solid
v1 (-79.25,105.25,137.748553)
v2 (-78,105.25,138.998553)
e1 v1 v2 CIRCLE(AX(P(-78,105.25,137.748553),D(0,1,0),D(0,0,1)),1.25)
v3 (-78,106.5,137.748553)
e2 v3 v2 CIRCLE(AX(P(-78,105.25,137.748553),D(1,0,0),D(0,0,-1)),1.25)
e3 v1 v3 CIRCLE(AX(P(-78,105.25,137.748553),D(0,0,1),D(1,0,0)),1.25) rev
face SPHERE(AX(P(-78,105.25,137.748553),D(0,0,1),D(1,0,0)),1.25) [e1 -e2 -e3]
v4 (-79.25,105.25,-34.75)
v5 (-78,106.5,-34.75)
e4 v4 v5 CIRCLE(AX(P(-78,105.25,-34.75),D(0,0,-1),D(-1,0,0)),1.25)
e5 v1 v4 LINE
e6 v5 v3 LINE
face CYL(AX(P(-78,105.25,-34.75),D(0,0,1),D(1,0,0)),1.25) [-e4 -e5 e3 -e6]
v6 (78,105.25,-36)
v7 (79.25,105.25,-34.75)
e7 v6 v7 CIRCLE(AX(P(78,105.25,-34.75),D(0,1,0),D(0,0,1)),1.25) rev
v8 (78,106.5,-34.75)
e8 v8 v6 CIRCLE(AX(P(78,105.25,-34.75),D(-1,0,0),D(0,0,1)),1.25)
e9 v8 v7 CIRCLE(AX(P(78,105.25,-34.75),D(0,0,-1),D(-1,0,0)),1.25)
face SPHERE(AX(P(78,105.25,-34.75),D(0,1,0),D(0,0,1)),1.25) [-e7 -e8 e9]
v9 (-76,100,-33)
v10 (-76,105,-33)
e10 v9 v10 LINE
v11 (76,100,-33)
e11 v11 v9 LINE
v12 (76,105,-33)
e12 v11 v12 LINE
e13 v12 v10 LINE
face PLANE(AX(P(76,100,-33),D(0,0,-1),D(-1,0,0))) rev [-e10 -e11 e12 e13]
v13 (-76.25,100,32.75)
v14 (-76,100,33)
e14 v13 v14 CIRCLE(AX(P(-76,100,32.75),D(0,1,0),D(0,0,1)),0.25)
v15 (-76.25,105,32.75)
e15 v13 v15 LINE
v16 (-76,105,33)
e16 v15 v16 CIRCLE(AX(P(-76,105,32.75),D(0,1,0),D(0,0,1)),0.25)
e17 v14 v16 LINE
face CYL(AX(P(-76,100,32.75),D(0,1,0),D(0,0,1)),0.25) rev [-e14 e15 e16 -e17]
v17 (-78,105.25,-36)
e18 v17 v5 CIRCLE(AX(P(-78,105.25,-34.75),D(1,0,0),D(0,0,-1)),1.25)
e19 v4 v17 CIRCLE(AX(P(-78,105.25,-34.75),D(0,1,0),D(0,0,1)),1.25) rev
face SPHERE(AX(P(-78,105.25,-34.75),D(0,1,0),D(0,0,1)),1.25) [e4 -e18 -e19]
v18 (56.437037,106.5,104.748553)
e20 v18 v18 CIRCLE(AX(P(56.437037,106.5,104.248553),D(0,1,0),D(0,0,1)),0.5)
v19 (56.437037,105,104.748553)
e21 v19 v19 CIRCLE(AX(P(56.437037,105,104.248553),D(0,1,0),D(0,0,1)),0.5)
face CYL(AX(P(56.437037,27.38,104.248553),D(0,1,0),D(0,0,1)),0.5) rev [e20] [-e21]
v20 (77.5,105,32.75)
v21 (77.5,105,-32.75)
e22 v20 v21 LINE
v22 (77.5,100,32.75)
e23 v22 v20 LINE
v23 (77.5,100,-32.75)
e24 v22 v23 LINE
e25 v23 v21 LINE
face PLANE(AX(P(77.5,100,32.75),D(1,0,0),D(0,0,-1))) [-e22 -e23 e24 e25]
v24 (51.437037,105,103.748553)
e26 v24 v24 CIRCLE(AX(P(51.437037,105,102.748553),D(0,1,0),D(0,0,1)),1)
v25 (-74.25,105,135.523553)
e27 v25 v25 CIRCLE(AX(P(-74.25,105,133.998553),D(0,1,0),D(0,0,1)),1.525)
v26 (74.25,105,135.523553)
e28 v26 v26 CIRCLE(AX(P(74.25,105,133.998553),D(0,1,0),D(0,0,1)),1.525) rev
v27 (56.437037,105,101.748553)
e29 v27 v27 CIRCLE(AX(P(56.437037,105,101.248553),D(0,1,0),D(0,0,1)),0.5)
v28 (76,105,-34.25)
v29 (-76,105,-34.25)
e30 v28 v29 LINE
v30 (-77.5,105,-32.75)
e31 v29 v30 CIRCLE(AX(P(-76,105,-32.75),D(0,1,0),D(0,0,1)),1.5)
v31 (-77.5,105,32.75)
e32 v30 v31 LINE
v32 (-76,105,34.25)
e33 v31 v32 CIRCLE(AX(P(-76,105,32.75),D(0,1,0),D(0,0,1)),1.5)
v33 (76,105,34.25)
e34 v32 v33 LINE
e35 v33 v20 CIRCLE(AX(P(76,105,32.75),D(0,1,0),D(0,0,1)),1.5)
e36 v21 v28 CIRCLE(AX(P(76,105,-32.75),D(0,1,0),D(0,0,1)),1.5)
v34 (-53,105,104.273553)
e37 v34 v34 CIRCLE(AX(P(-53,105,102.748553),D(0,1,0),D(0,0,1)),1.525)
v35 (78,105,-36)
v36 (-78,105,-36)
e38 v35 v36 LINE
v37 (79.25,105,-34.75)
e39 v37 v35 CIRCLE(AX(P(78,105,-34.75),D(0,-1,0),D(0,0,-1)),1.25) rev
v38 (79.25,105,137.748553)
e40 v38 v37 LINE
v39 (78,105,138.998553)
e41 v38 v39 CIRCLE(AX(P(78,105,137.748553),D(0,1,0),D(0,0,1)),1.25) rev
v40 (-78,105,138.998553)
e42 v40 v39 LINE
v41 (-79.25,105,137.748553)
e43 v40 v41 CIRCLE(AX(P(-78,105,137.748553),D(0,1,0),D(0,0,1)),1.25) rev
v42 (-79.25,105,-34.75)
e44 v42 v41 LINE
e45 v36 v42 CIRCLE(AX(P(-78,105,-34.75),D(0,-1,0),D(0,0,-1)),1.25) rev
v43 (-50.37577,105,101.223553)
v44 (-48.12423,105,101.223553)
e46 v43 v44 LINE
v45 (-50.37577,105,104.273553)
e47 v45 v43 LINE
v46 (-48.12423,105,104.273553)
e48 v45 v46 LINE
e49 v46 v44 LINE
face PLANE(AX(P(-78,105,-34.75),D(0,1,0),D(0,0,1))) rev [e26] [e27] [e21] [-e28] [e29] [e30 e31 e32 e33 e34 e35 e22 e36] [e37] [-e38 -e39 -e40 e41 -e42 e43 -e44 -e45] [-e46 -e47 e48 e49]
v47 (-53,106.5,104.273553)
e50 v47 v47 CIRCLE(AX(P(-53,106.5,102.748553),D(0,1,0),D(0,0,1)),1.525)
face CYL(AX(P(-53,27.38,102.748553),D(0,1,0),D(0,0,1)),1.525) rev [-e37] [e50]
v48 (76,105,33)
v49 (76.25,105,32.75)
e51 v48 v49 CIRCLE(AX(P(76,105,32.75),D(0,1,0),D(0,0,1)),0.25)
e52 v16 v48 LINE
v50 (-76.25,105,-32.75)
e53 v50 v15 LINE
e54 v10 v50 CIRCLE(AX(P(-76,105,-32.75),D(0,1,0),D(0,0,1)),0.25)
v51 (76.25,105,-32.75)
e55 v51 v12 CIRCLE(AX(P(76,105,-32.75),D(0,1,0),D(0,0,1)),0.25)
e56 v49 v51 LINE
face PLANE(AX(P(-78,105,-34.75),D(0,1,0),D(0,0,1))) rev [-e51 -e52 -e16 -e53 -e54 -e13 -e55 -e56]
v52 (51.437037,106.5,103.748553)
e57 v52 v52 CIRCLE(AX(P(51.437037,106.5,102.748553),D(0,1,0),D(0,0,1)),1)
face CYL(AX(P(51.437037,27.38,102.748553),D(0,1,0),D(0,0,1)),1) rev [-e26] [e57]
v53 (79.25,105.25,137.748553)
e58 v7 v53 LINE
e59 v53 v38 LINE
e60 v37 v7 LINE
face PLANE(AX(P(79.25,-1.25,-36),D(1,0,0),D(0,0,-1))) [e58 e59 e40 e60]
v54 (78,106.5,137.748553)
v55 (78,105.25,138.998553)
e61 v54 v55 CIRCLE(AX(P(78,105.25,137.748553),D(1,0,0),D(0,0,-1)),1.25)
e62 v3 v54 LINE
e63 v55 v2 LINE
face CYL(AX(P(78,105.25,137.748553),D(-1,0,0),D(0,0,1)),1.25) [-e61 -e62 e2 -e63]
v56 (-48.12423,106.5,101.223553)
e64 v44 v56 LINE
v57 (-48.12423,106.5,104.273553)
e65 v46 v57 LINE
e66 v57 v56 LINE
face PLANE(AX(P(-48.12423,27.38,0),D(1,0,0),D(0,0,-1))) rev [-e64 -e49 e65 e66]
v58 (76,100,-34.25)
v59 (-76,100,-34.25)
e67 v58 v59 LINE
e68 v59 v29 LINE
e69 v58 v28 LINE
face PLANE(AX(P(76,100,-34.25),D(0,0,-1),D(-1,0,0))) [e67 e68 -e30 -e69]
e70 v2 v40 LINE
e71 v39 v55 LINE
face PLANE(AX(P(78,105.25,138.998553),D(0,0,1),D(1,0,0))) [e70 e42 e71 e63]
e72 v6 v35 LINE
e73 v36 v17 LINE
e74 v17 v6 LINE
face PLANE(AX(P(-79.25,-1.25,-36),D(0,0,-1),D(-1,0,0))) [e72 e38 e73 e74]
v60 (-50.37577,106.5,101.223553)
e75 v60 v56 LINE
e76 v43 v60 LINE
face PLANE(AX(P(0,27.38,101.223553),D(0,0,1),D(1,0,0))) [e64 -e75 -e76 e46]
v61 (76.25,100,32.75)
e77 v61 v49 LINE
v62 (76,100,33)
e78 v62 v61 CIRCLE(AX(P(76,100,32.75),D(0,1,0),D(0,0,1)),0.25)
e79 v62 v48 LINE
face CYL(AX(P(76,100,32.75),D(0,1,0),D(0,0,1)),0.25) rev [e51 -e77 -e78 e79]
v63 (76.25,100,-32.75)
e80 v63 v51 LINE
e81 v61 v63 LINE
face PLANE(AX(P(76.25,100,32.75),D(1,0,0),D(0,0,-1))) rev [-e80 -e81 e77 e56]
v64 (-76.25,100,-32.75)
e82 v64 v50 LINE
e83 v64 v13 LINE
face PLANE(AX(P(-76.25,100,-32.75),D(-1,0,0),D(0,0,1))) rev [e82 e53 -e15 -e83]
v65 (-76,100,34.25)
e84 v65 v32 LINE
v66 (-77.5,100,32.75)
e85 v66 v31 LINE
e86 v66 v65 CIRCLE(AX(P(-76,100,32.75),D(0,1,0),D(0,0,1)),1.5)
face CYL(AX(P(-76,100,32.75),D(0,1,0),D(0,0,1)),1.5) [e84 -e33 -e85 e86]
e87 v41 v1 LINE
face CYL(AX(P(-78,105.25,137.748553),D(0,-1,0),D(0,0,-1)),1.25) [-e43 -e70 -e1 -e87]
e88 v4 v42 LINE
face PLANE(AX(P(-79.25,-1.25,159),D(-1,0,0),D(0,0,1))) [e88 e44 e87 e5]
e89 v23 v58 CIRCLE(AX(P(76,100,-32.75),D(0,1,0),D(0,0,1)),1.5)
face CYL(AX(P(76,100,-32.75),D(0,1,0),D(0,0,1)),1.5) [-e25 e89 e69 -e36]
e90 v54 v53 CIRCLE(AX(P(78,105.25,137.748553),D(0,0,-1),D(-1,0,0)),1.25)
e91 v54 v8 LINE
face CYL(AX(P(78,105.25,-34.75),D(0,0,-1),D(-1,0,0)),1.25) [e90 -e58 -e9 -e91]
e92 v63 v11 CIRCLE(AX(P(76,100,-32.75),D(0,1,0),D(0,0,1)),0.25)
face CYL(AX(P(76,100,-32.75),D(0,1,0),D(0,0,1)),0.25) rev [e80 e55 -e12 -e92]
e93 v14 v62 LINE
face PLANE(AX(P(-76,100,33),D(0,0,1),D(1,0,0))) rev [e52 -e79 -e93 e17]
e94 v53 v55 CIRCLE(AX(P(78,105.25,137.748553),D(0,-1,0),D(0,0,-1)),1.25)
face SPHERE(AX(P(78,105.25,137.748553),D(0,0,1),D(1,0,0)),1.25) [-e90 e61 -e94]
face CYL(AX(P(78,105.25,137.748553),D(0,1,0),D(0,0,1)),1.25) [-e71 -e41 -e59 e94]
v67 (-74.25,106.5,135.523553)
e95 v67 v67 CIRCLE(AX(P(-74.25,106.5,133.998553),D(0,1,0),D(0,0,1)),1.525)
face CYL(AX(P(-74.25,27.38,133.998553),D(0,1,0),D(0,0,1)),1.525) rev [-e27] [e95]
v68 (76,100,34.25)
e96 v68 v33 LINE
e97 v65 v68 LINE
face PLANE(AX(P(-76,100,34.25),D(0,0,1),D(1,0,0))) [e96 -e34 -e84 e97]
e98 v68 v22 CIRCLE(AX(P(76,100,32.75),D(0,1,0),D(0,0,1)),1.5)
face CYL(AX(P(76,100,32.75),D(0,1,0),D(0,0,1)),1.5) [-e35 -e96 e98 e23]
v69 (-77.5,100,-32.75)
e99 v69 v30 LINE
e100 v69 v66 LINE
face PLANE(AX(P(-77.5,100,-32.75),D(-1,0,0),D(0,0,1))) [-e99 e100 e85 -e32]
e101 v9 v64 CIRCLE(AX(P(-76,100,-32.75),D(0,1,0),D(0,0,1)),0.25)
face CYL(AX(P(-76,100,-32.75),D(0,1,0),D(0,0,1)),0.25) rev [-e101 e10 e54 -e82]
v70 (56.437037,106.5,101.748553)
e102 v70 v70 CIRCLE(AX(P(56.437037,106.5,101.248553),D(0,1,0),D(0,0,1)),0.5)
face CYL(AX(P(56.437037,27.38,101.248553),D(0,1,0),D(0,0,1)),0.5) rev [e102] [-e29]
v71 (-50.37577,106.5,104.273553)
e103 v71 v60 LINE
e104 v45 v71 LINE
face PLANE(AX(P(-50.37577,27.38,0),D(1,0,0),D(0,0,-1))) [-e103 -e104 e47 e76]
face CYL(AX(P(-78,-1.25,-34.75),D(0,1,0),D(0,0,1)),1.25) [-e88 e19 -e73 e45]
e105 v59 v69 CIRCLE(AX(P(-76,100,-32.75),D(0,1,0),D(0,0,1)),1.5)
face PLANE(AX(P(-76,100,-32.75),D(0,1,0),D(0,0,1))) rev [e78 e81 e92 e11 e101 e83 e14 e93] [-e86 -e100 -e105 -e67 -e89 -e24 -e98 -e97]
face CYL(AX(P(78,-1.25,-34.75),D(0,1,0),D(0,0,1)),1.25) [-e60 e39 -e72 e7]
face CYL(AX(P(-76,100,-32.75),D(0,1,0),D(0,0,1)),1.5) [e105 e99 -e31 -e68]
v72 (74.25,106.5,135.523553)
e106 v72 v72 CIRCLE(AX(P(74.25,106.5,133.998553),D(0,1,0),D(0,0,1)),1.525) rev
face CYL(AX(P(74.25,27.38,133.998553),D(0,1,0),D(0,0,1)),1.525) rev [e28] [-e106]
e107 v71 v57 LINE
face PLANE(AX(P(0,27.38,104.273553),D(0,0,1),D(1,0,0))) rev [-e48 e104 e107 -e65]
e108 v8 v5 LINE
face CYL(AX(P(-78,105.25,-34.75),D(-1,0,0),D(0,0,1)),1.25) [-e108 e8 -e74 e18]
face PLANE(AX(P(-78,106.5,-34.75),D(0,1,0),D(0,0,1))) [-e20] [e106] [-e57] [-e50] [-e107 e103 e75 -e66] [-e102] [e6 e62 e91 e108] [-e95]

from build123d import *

# Parameters (mm, degrees)
BOSS_EXTRUDE1_DEPTH      = 1.25
SKETCH1_W                = 156
SKETCH1_H                = 69.5
BOSS_EXTRUDE2_DEPTH      = 105
SKETCH4_R                = 2.5000000000000027
BOSS_EXTRUDE3_DEPTH      = 8
FILLET2_R                = 2
SKETCH5_R                = 1.5499999999999998
SKETCH5_R_2              = 1.5500000000000012
CUT_EXTRUDE1_DEPTH       = 8
SKETCH6_R                = 8.25
CUT_EXTRUDE2_DEPTH       = 8
SKETCH8_R                = 3.750000000000007
SKETCH8_R_2              = 3.0000000000000084
SKETCH8_W                = 7.000000000000014
SKETCH8_H                = 14
CUT_EXTRUDE3_DEPTH       = 8
FILLET3_R                = 1.25
FILLET4_R                = 1.25
SKETCH11_R               = 1.5499999999999932
CUT_EXTRUDE4_DEPTH       = 8
BOSS_EXTRUDE5_REACH      = 209.004
FILLET5_R                = 1.25
SKETCH14_R               = 1.5249999999999995
CUT_EXTRUDE5_DEPTH       = 8
BOSS_EXTRUDE6_DEPTH      = 5
CUT_EXTRUDE10_DEPTH      = 176.50000000000017
CUT_EXTRUDE10_DEPTH_BACK = 9
SKETCH19_R               = 1.5249999999999995
BOSS_EXTRUDE7_DEPTH      = 1.5
SKETCH17_W               = 214.39373035957487
SKETCH17_H               = 311.75060194691184
CUT_EXTRUDE6_DEPTH       = 142.50000000000003
SKETCH18_W               = 843.8612520819788
SKETCH18_H               = 210.19069540658822
CUT_EXTRUDE7_DEPTH       = 211.50000000000009
FILLET6_R                = 1.25
SKETCH21_R               = 1.5249999999999995
CUT_EXTRUDE11_DEPTH      = 46.50000000000004
SKETCH22_R               = 1.5249999999999952
SKETCH22_R_2             = 0.49999999999999917
SKETCH22_R_3             = 0.9999999999999983
CUT_EXTRUDE12_DEPTH      = 46.50000000000004
SKETCH23_W               = 224.34927592813784
SKETCH23_H               = 20
CUT_EXTRUDE13_DEPTH      = 108.00000000000004
SKETCH24_W               = 223.8278832276348
SKETCH24_H               = 83.20006380200533
CUT_EXTRUDE14_DEPTH      = 108.00000000000004
BOSS_EXTRUDE8_DEPTH      = 79.12
FILLET7_R                = 1.25
SKETCH27_R               = 1.5249999999999904
SKETCH27_R_2             = 0.9999999999999983
SKETCH27_R_3             = 0.4999999999999892
SKETCH27_R_4             = 0.5000000000000013
SKETCH27_W               = 2.251539255366019
SKETCH27_H               = 3.049999999999997
CUT_EXTRUDE16_DEPTH      = 79.12
SKETCH28_R               = 1.5249999999999995
CUT_EXTRUDE17_DEPTH      = 79.12


with BuildPart() as part:
    # Sketch2 → Boss-Extrude1 (new body)
    with BuildSketch(Plane(origin=(0, 0, 0), x_dir=(1, 0, 0), z_dir=(0, 1, 0))):
        Polygon((-79.25000000000004, 35.99999999999998), (79.24999999999996, 35.99999999999999), (79.24999999999999, -159.00000000000003), (-79.25000000000001, -159.00000000000003), align=None)
    extrude(amount=-BOSS_EXTRUDE1_DEPTH)

    # Sketch1 → Boss-Extrude2 (add)
    with BuildSketch(Plane(origin=(0, 0, 0), x_dir=(1, 0, 0), z_dir=(0, 1, 0))):
        Polygon((79.24999999999999, -159.00000000000003), (-79.25000000000001, -159.00000000000003), (-79.25000000000004, -86.00000000000001), (-79.25000000000004, -36.00000000000002), (-79.25000000000004, 35.99999999999998), (79.24999999999996, 35.99999999999999), (79.24999999999996, -36.00000000000002), (79.24999999999996, -86.00000000000001), align=None)
        Polygon((-78.00000000000001, -157.75000000000006), (77.99999999999999, -157.75000000000006), (77.99999999999996, -86.00000000000001), (77.99999999999996, -36.00000000000002), (-78.00000000000004, -36.00000000000002), (-78.00000000000004, -86.00000000000001), (-78.00000000000004, -100.58859756900745), align=None, mode=Mode.SUBTRACT)
        Rectangle(SKETCH1_W, SKETCH1_H, mode=Mode.SUBTRACT)
    extrude(amount=BOSS_EXTRUDE2_DEPTH)

    # Sketch4 → Boss-Extrude3 (add)
    with BuildSketch(Plane(origin=(0, 0, 0), x_dir=(1, 0, 0), z_dir=(0, 1, 0))):
        with Locations(Location((-37.074999999999996, -117.75000000000004, 0), (0, 0, 90))):
            Circle(SKETCH4_R)
        with Locations(Location((37.074999999999996, -117.75000000000003, 0), (0, 0, 90))):
            Circle(SKETCH4_R)
    extrude(amount=BOSS_EXTRUDE3_DEPTH)

    # Fillet2
    fillet2_edges = [part.edges().sort_by_distance(p)[0] for p in [
        (77.99999999999996, 52.5, -34.749999999999986),
        (77.99999999999996, 52.5, 34.750000000000014),
        (-78.00000000000004, 0, 1.421e-14),
        (-78.00000000000004, 52.5, 34.750000000000014),
        (77.99999999999999, 52.5, 157.75000000000006),
        (-78.00000000000001, 52.5, 157.75000000000006),
        (-4.263e-14, 0, 36.00000000000002),
        (-78.00000000000004, 52.5, 36.00000000000002),
        (77.99999999999997, 0, 96.87500000000003),
        (77.99999999999996, 52.5, 36.00000000000002),
        (-4.263e-14, 0, -34.749999999999986),
        (-78.00000000000004, 52.5, -34.749999999999986),
        (-1.421e-14, 0, 157.75000000000006),
        (-78.00000000000003, 0, 96.87500000000004),
        (77.99999999999996, 0, 1.421e-14),
        (-4.263e-14, 0, 34.750000000000014),
        (-37.074999999999996, 0, 120.25000000000004),
        (37.074999999999996, 0, 120.25000000000003),
    ]]
    fillet(fillet2_edges, radius=FILLET2_R)

    # Sketch5 → Cut-Extrude1 (cut)
    with BuildSketch(Plane.XY.offset(36.00000000000002)):
        with BuildLine():
            ThreePointArc((-53.750000000000085, 99.54999999999998), (-54.84601551083924, 99.09601551083914), (-55.30000000000008, 97.99999999999999))
            Line((-55.30000000000008, 97.99999999999999), (-53.750000000000085, 97.99999999999999))
            Line((-53.750000000000085, 97.99999999999999), (-53.750000000000085, 99.54999999999998))
        make_face()
        with BuildLine():
            Line((-53.750000000000085, 97.99999999999999), (-55.30000000000008, 97.99999999999999))
            ThreePointArc((-55.30000000000008, 97.99999999999999), (-53.750000000000085, 96.44999999999999), (-52.20000000000009, 97.99999999999999))
            ThreePointArc((-52.20000000000009, 97.99999999999999), (-52.65398448916093, 99.09601551083914), (-53.750000000000085, 99.54999999999998))
            Line((-53.750000000000085, 99.54999999999998), (-53.750000000000085, 97.99999999999999))
        make_face()
        with Locations((53.750000000000206, 97.99999999999967)):
            Circle(SKETCH5_R)
        with Locations((-53.750000000000085, 7.999999999999743)):
            Circle(SKETCH5_R_2)
        with Locations((53.749999999999666, 7.9999999999994245)):
            Circle(SKETCH5_R_2)
    extrude(amount=-CUT_EXTRUDE1_DEPTH, mode=Mode.SUBTRACT)

    # Sketch6 → Cut-Extrude2 (cut)
    with BuildSketch(Plane(origin=(0, 0, 157.75000000000006), x_dir=(-1, 0, 0), z_dir=(0, 0, -1))):
        with Locations((0, 22)):
            Circle(SKETCH6_R)
    extrude(amount=-CUT_EXTRUDE2_DEPTH, mode=Mode.SUBTRACT)

    # Sketch8 → Cut-Extrude3 (cut)
    with BuildSketch(Plane.ZY.offset(79.25000000000004)):
        with Locations((131.5, 54.99999999999998)):
            Circle(SKETCH8_R)
        with Locations((101.50000000000001, 54.99999999999998)):
            Circle(SKETCH8_R_2)
        with Locations((116.50000000000003, 64.99999999999999)):
            Rectangle(SKETCH8_W, SKETCH8_H)
        with Locations((101.50000000000001, 64.99999999999997)):
            Circle(SKETCH8_R_2)
        with Locations((101.50000000000001, 74.99999999999997)):
            Circle(SKETCH8_R_2)
        with Locations((101.50000000000001, 84.99999999999997)):
            Circle(SKETCH8_R_2)
        with Locations((131.5, 74.99999999999999)):
            Circle(SKETCH8_R)
    extrude(amount=-CUT_EXTRUDE3_DEPTH, mode=Mode.SUBTRACT)

    # Fillet3
    fillet3_edges = [part.edges().sort_by_distance(p)[0] for p in [
        (79.24999999999997, -1.25, 61.50000000000002),
        (-4.263e-14, -1.25, -35.999999999999986),
        (-79.25000000000003, -1.25, 61.50000000000003),
        (-1.421e-14, -1.25, 159.00000000000003),
    ]]
    fillet(fillet3_edges, radius=FILLET3_R)

    # Fillet4
    # the kernel refuses this fillet: 1.25 mm, written as the material it takes off along each edge
    with BuildSketch(Plane(origin=(-78.00000000000004, 0, -34.74999999999997), x_dir=(-9e-17, 0, -1), z_dir=(-1, 0, 1.5e-16))) as fillet4_piece_1_section:
        Polygon((0, 0), (FILLET4_R, 0), (FILLET4_R, FILLET4_R), (0, FILLET4_R), align=None)
    fillet4_piece_1 = extrude(amount=FILLET4_R, mode=Mode.PRIVATE)
    fillet4_piece_1 = fillet4_piece_1 - Plane(origin=(-78.00000000000004, 0, -34.74999999999997), x_dir=(0, 0.7071067811865475, 0.7071067811865475), z_dir=(-1, 0, 1.5e-16)) * Sphere(FILLET4_R, mode=Mode.PRIVATE)
    add(fillet4_piece_1, mode=Mode.SUBTRACT)
    with BuildSketch(Plane(origin=(77.99999999999996, 0, -34.74999999999999), x_dir=(-9e-17, 0, -1), z_dir=(1, 0, -1.5e-16))) as fillet4_piece_2_section:
        Polygon((0, 0), (FILLET4_R, 0), (FILLET4_R, -FILLET4_R), (0, -FILLET4_R), align=None)
    fillet4_piece_2 = extrude(amount=FILLET4_R, mode=Mode.PRIVATE)
    fillet4_piece_2 = fillet4_piece_2 - Plane(origin=(77.99999999999996, 0, -34.74999999999999), x_dir=(0, 0.7071067811865475, 0.7071067811865475), z_dir=(1, 0, -1.5e-16)) * Sphere(FILLET4_R, mode=Mode.PRIVATE)
    add(fillet4_piece_2, mode=Mode.SUBTRACT)
    with BuildSketch(Plane(origin=(-78.00000000000001, 0, 157.75000000000003), x_dir=(-1, 0, 1.5e-16), z_dir=(0, 0, 1))) as fillet4_piece_3_section:
        Polygon((0, 0), (FILLET4_R, 0), (FILLET4_R, FILLET4_R), (0, FILLET4_R), align=None)
    fillet4_piece_3 = extrude(amount=FILLET4_R, mode=Mode.PRIVATE)
    fillet4_piece_3 = fillet4_piece_3 - Plane(origin=(-78.00000000000001, 0, 157.75000000000003), x_dir=(0.7071067811865475, 0.7071067811865475, 0), z_dir=(0, 0, 1)) * Sphere(FILLET4_R, mode=Mode.PRIVATE)
    add(fillet4_piece_3, mode=Mode.SUBTRACT)
    with BuildSketch(Plane(origin=(77.99999999999999, 0, 157.75000000000003), x_dir=(1, 0, -1.5e-16), z_dir=(0, 0, 1))) as fillet4_piece_4_section:
        Polygon((0, 0), (FILLET4_R, 0), (FILLET4_R, -FILLET4_R), (0, -FILLET4_R), align=None)
    fillet4_piece_4 = extrude(amount=FILLET4_R, mode=Mode.PRIVATE)
    fillet4_piece_4 = fillet4_piece_4 - Plane(origin=(77.99999999999999, 0, 157.75000000000003), x_dir=(-0.7071067811865475, 0.7071067811865475, 0), z_dir=(0, 0, 1)) * Sphere(FILLET4_R, mode=Mode.PRIVATE)
    add(fillet4_piece_4, mode=Mode.SUBTRACT)
    with BuildSketch(Plane(origin=(79.24999999999999, 108.12500000000007, 159.00000000000003), x_dir=(-1, 0, 0), z_dir=(0, -1, 0))) as fillet4_piece_5:
        with BuildLine():
            CenterArc((FILLET4_R, FILLET4_R), FILLET4_R, 179.9999999999987, 90.00000000000131)
            Line((0, FILLET4_R), (0, 0))
            Line((0, 0), (FILLET4_R, 0))
        make_face()
    extrude(amount=108.12500000000007, mode=Mode.SUBTRACT)
    with BuildSketch(Plane(origin=(-79.25000000000001, -2.2e-16, 159.00000000000003), x_dir=(1, 0, 0), z_dir=(0, 1, 0))) as fillet4_piece_6:
        with BuildLine():
            CenterArc((FILLET4_R, FILLET4_R), FILLET4_R, 180, 90)
            Line((0, FILLET4_R), (0, 0))
            Line((0, 0), (FILLET4_R, 0))
        make_face()
    extrude(amount=108.12499999999999, mode=Mode.SUBTRACT)
    with BuildSketch(Plane(origin=(79.24999999999996, 108.125, -35.99999999999999), x_dir=(0, 0, 1), z_dir=(0, -1, 0))) as fillet4_piece_7:
        with BuildLine():
            CenterArc((FILLET4_R, FILLET4_R), FILLET4_R, 180, 90)
            Line((0, FILLET4_R), (0, 0))
            Line((0, 0), (FILLET4_R, 0))
        make_face()
    extrude(amount=108.125, mode=Mode.SUBTRACT)
    with BuildSketch(Plane(origin=(-79.25000000000004, -2.2e-16, -35.99999999999998), x_dir=(0, 0, 1), z_dir=(0, 1, 0))) as fillet4_piece_8:
        with BuildLine():
            CenterArc((FILLET4_R, FILLET4_R), FILLET4_R, 180, 90)
            Line((-2.132e-14, FILLET4_R), (0, 0))
            Line((0, 0), (FILLET4_R, 0))
        make_face()
    extrude(amount=108.12499999999999, mode=Mode.SUBTRACT)

    # Sketch11 → Cut-Extrude4 (cut)
    with BuildSketch(Plane(origin=(79.24999999999996, 0, -1.128e-14), x_dir=(-1.4e-16, 0, -1), z_dir=(1, 0, -1.4e-16))):
        with BuildLine():
            ThreePointArc((-13.05000000000001, 102.49999999999999), (-12.596015510839159, 101.40398448916083), (-11.50000000000001, 100.94999999999999))
            Line((-11.50000000000001, 100.94999999999999), (-11.50000000000001, 102.49999999999999))
            Line((-11.500000000000014, 102.49999999999999), (-13.050000000000011, 102.49999999999999))
        make_face()
        with BuildLine():
            Line((-11.50000000000001, 102.49999999999999), (-11.50000000000001, 100.94999999999999))
            ThreePointArc((-11.50000000000001, 100.94999999999999), (-10.403984489160864, 101.40398448916083), (-9.950000000000012, 102.49999999999999))
            ThreePointArc((-9.950000000000012, 102.49999999999999), (-11.50000000000001, 104.04999999999998), (-13.05000000000001, 102.49999999999999))
            Line((-13.050000000000011, 102.49999999999999), (-11.500000000000014, 102.49999999999999))
        make_face()
        with BuildLine():
            ThreePointArc((-25.550000000000008, 90), (-25.096015510839155, 88.90398448916085), (-24.000000000000007, 88.45))
            Line((-24.000000000000007, 88.45000000000002), (-24.000000000000007, 90))
            Line((-24, 90), (-25.55000000000001, 90))
        make_face()
        with BuildLine():
            Line((-24.000000000000007, 90), (-24.000000000000007, 88.45000000000002))
            ThreePointArc((-24.000000000000007, 88.45), (-22.90398448916086, 88.90398448916085), (-22.450000000000006, 90))
            ThreePointArc((-22.450000000000006, 90), (-24.000000000000007, 91.55), (-25.550000000000008, 90))
            Line((-25.55000000000001, 90), (-24, 90))
        make_face()
        with BuildLine():
            ThreePointArc((-9.949999999999998, 2.4999999999999742), (-10.403984489160848, 3.5960155108391216), (-11.499999999999995, 4.049999999999974))
            Line((-11.499999999999996, 4.049999999999969), (-11.499999999999996, 2.4999999999999716))
            Line((-11.5, 2.4999999999999742), (-13.049999999999997, 2.4999999999999742))
            ThreePointArc((-13.049999999999995, 2.4999999999999742), (-11.499999999999996, 0.9499999999999749), (-9.949999999999998, 2.499999999999974))
        make_face()
        with BuildLine():
            Line((-11.499999999999996, 2.4999999999999716), (-11.499999999999996, 4.049999999999969))
            ThreePointArc((-11.499999999999995, 4.049999999999974), (-12.596015510839145, 3.596015510839123), (-13.049999999999995, 2.4999999999999742))
            Line((-13.049999999999997, 2.4999999999999742), (-11.5, 2.4999999999999742))
        make_face()
        with BuildLine():
            ThreePointArc((-111.5, 4.049999999999969), (-112.59601551083915, 1.40398448916083), (-109.95, 2.499999999999974))
            Line((-109.95, 2.4999999999999742), (-111.5, 2.4999999999999742))
            Line((-111.5, 2.4999999999999716), (-111.5, 4.049999999999969))
        make_face()
        with BuildLine():
            Line((-111.5, 2.4999999999999742), (-109.95, 2.4999999999999742))
            ThreePointArc((-109.95, 2.4999999999999742), (-110.40398448916086, 3.5960155108391185), (-111.5, 4.049999999999969))
            Line((-111.5, 4.049999999999969), (-111.5, 2.4999999999999716))
        make_face()
        with BuildLine():
            ThreePointArc((-97.45, 14.999999999999993), (-97.90398448916086, 16.096015510839138), (-99, 16.549999999999986))
            Line((-99, 16.549999999999986), (-99, 14.999999999999993))
            Line((-99, 14.999999999999993), (-97.45, 14.999999999999993))
        make_face()
        with BuildLine():
            Line((-99, 14.999999999999993), (-99, 16.549999999999986))
            ThreePointArc((-99, 16.549999999999986), (-100.09601551083915, 13.903984489160848), (-97.45, 14.999999999999993))
            Line((-97.45, 14.999999999999993), (-99, 14.999999999999993))
        make_face()
        with BuildLine():
            ThreePointArc((-22.450000000000006, 14.999999999999993), (-22.90398448916086, 16.09601551083914), (-24.000000000000007, 16.549999999999994))
            Line((-24.000000000000007, 16.549999999999994), (-24.000000000000007, 14.999999999999993))
            Line((-24, 14.999999999999993), (-25.55000000000001, 14.999999999999993))
            ThreePointArc((-25.550000000000008, 14.999999999999993), (-24.000000000000007, 13.449999999999992), (-22.450000000000006, 14.999999999999993))
        make_face()
        with BuildLine():
            Line((-24.000000000000007, 14.999999999999993), (-24.000000000000007, 16.549999999999994))
            ThreePointArc((-24.000000000000007, 16.549999999999994), (-25.096015510839155, 16.09601551083914), (-25.550000000000008, 14.999999999999993))
            Line((-25.55000000000001, 14.999999999999993), (-24, 14.999999999999993))
        make_face()
        with Locations((-111.50000000000001, 102.49999999999999)):
            Circle(SKETCH11_R)
        with Locations((-99, 90)):
            Circle(SKETCH11_R)
    extrude(amount=-CUT_EXTRUDE4_DEPTH, mode=Mode.SUBTRACT)

    # Boss-Extrude5: up to this face of the body (flat: up to its plane)
    boss_extrude5_end = Plane(part.part.faces().sort_by_distance((0, 0, 96.725539908))[0])
    # Sketch12 → Boss-Extrude5 (add, up to the picked face)
    with BuildSketch(Plane(origin=(0, 105, 0), x_dir=(1, 0, 0), z_dir=(0, 1, 0)), mode=Mode.PRIVATE) as boss_extrude5_sk1:
        with BuildLine():
            Line((73, -152.75000000000043), (72.99999999999997, -157.75000000000043))
            Line((72.99999999999997, -157.75000000000043), (75.99999999999996, -157.75000000000045))
            ThreePointArc((75.99999999999996, -157.75000000000006), (77.41421356237305, -157.16421356237316), (77.99999999999994, -155.75000000000006))
            Line((77.99999999999999, -155.75000000000006), (78, -152.75000000000045))
            Line((78, -152.75000000000045), (73, -152.75000000000043))
        make_face()
    boss_extrude5_tool1 = split(extrude(boss_extrude5_sk1.sketch, amount=-BOSS_EXTRUDE5_REACH, mode=Mode.PRIVATE), bisect_by=boss_extrude5_end, keep=Keep.BOTH, mode=Mode.PRIVATE)
    # Sketch12 → Boss-Extrude5 (add, up to the picked face)
    with BuildSketch(Plane(origin=(0, 105, 0), x_dir=(1, 0, 0), z_dir=(0, 1, 0)), mode=Mode.PRIVATE) as boss_extrude5_sk2:
        with BuildLine():
            ThreePointArc((-78.00000000000003, -155.75000000000006), (-77.41421356237313, -157.16421356237316), (-76.00000000000003, -157.75000000000006))
            Line((-76.00000000000003, -157.75000000000006), (-73.00000000000003, -157.75000000000006))
            Line((-73.00000000000003, -157.75000000000006), (-73.00000000000003, -152.75000000000006))
            Line((-73.00000000000003, -152.75000000000006), (-78.00000000000003, -152.75000000000006))
            Line((-78.00000000000003, -152.75000000000006), (-78.00000000000003, -155.75000000000006))
        make_face()
    boss_extrude5_tool2 = split(extrude(boss_extrude5_sk2.sketch, amount=-BOSS_EXTRUDE5_REACH, mode=Mode.PRIVATE), bisect_by=boss_extrude5_end, keep=Keep.BOTH, mode=Mode.PRIVATE)
    add(boss_extrude5_tool1.solids().sort_by(Axis((75.426992, 105, 155.176992), (0, -1, 0)))[0])
    add(boss_extrude5_tool2.solids().sort_by(Axis((-75.426992, 105, 155.176992), (0, -1, 0)))[0])

    # Fillet5
    fillet5_edges = [part.edges().sort_by_distance(p)[0] for p in [
        (77.41421356237306, 0.5857864376269042, 152.75000000000043),
        (72.99999999999999, 0.5857864376269046, 157.16421356237316),
        (72.99999999999997, 53.5, 157.75000000000043),
        (74.49999999999999, 0, 152.75000000000043),
        (73, 52.5, 152.75000000000043),
        (78, 53.5, 152.75000000000045),
        (73, 0, 154.25000000000023),
        (-77.41421356237313, 0.5857864376269042, 152.75000000000006),
        (-73.00000000000003, 0, 154.25000000000006),
        (-73.00000000000003, 52.5, 152.75000000000006),
        (-78.00000000000003, 53.5, 152.75000000000006),
        (-74.50000000000003, 0, 152.75000000000006),
        (-73.00000000000003, 0.5857864376269046, 157.16421356237316),
        (-73.00000000000003, 53.5, 157.75000000000006),
    ]]
    fillet(fillet5_edges, radius=FILLET5_R)

    # Sketch14 → Cut-Extrude5 (cut)
    with BuildSketch(Plane(origin=(0, 105, 0), x_dir=(1, 0, 0), z_dir=(0, 1, 0))):
        with Locations(Location((75.68305826175839, -155.43305826175865, 0), (0, 0, 270))):
            Circle(SKETCH14_R)
        with Locations(Location((-75.68305826175845, -155.43305826175828, 0), (0, 0, 270))):
            Circle(SKETCH14_R)
    extrude(amount=-CUT_EXTRUDE5_DEPTH, mode=Mode.SUBTRACT)

    # Sketch19 → Cut-Extrude10 (cut, two sides: drawn at the far end of the back side and taken through both)
    with BuildSketch(Plane(origin=(0, 105, 0), x_dir=(1, 0, 0), z_dir=(0, 1, 0)).offset(-CUT_EXTRUDE10_DEPTH_BACK)):
        with Locations(Location((75.68305826175839, -155.43305826175865, 0), (0, 0, 270))):
            Circle(SKETCH19_R)
        with Locations(Location((-75.68305826175845, -155.43305826175828, 0), (0, 0, 270))):
            Circle(SKETCH19_R)
    extrude(amount=CUT_EXTRUDE10_DEPTH + CUT_EXTRUDE10_DEPTH_BACK, mode=Mode.SUBTRACT)



with BuildPart() as body_2:
    # Sketch15 → Boss-Extrude6 (new body)
    with BuildSketch(Plane(origin=(0, 105, 0), x_dir=(1, 0, 0), z_dir=(0, 1, 0))):
        with BuildLine():
            Line((-77.50000000000004, 32.749999999999986), (-77.50000000000004, -32.750000000000014))
            ThreePointArc((-77.50000000000004, -32.750000000000014), (-77.06066017177986, -33.81066017177984), (-76.00000000000004, -34.250000000000014))
            Line((-76.00000000000004, -34.250000000000014), (75.99999999999996, -34.250000000000014))
            ThreePointArc((75.99999999999996, -34.250000000000014), (77.06066017177977, -33.81066017177984), (77.49999999999996, -32.750000000000014))
            Line((77.49999999999996, -32.750000000000014), (77.49999999999996, 32.749999999999986))
            ThreePointArc((77.49999999999996, 32.749999999999986), (77.06066017177977, 33.81066017177981), (75.99999999999996, 34.249999999999986))
            Line((75.99999999999996, 34.249999999999986), (-76.00000000000004, 34.249999999999986))
            ThreePointArc((-76.00000000000004, 34.249999999999986), (-77.06066017177986, 33.81066017177981), (-77.50000000000004, 32.749999999999986))
        make_face()
        with BuildLine():
            Line((75.99999999999996, 32.999999999999986), (-76.00000000000004, 32.999999999999986))
            ThreePointArc((-76.00000000000004, 32.999999999999986), (-76.17677669529668, 32.926776695296624), (-76.25000000000004, 32.749999999999986))
            Line((-76.25000000000004, 32.749999999999986), (-76.25000000000004, -32.750000000000014))
            ThreePointArc((-76.25000000000004, -32.750000000000014), (-76.17677669529668, -32.92677669529665), (-76.00000000000004, -33.000000000000014))
            Line((-76.00000000000004, -33.000000000000014), (75.99999999999996, -33.000000000000014))
            ThreePointArc((75.99999999999996, -33.000000000000014), (76.1767766952966, -32.92677669529665), (76.24999999999996, -32.750000000000014))
            Line((76.24999999999996, -32.750000000000014), (76.24999999999996, 32.749999999999986))
            ThreePointArc((76.24999999999996, 32.749999999999986), (76.1767766952966, 32.926776695296624), (75.99999999999996, 32.999999999999986))
        make_face(mode=Mode.SUBTRACT)
    extrude(amount=-BOSS_EXTRUDE6_DEPTH)


with BuildPart() as part_1:
    add(part.part)

    add(body_2.part)  # Boss-Extrude7 merges body 2
    # Sketch16 → Boss-Extrude7 (add)
    with BuildSketch(Plane(origin=(0, 105, 0), x_dir=(1, 0, 0), z_dir=(0, 1, 0))):
        with BuildLine():
            Line((-79.25000000000004, 34.74999999999998), (-79.25000000000004, -157.75000000000003))
            ThreePointArc((-79.25000000000004, -157.75000000000003), (-78.88388347648322, -158.63388347648322), (-78.00000000000001, -159.00000000000003))
            Line((-78.00000000000001, -159.00000000000003), (77.99999999999999, -159.00000000000003))
            ThreePointArc((77.99999999999999, -159.00000000000003), (78.88388347648316, -158.63388347648322), (79.24999999999999, -157.75000000000003))
            Line((79.24999999999999, -157.75000000000003), (79.24999999999991, 34.749999999999986))
            ThreePointArc((79.24999999999991, 34.749999999999986), (78.8838834764831, 35.63388347648314), (77.99999999999996, 35.99999999999997))
            Line((77.99999999999996, 35.99999999999997), (-78.00000000000004, 35.99999999999998))
            ThreePointArc((-78.00000000000004, 35.99999999999998), (-78.88388347648322, 35.63388347648316), (-79.25000000000004, 34.74999999999998))
        make_face()
    extrude(amount=BOSS_EXTRUDE7_DEPTH)

    # Sketch17 → Cut-Extrude6 (cut)
    with BuildSketch(Plane.XZ.offset(-105)):
        with Locations((-9.695908791144348, 54.3605461890202)):
            Rectangle(SKETCH17_W, SKETCH17_H)
        with BuildLine():
            Line((77.99999999999996, -32.749999999999986), (77.99999999999996, 32.750000000000014))
            ThreePointArc((77.99999999999996, 32.750000000000014), (77.41421356237305, 34.16421356237311), (75.99999999999996, 34.750000000000014))
            Line((75.99999999999996, 34.750000000000014), (-76.00000000000004, 34.750000000000014))
            ThreePointArc((-76.00000000000004, 34.750000000000014), (-77.41421356237313, 34.16421356237311), (-78.00000000000004, 32.750000000000014))
            Line((-78.00000000000004, 32.750000000000014), (-78.00000000000004, -32.749999999999986))
            ThreePointArc((-78.00000000000004, -32.749999999999986), (-77.41421356237313, -34.16421356237308), (-76.00000000000004, -34.749999999999986))
            Line((-76.00000000000004, -34.749999999999986), (75.99999999999996, -34.749999999999986))
            ThreePointArc((75.99999999999996, -34.749999999999986), (77.41421356237305, -34.16421356237308), (77.99999999999996, -32.749999999999986))
        make_face(mode=Mode.SUBTRACT)
    extrude(amount=CUT_EXTRUDE6_DEPTH, mode=Mode.SUBTRACT)


with BuildPart() as cut_extrude6_piece_1:
    # of the separate pieces the step leaves, piece 1, a body of its own (cut_extrude6_pieces)
    add(part_1.part.solids().sort_by_distance((-76, 105, -34.25))[0])

    # Fillet6
    fillet6_edges = [cut_extrude6_piece_1.edges().sort_by_distance(p)[0] for p in [
        (-78.88388347648322, 106.5, -35.633883476483156),
        (-79.25000000000004, 106.5, 61.50000000000002),
        (-78.88388347648322, 106.5, 158.63388347648322),
        (-1.421e-14, 106.5, 159.00000000000003),
        (78.88388347648318, 106.5, 158.63388347648322),
        (79.24999999999994, 106.5, 61.50000000000003),
        (78.8838834764831, 106.5, -35.63388347648314),
        (-4.263e-14, 106.5, -35.99999999999997),
    ]]
    fillet(fillet6_edges, radius=FILLET6_R)

    # Sketch21 → Cut-Extrude11 (cut)
    with BuildSketch(Plane(origin=(0, 106.5, 0), x_dir=(1, 0, 0), z_dir=(0, 1, 0))):
        with Locations(Location((-75.68068975770814, -155.43068975770817, 0), (0, 0, 270))):
            Circle(SKETCH21_R)
        with Locations(Location((75.68068975770811, -155.43068975770834, 0), (0, 0, 270))):
            Circle(SKETCH21_R)
    extrude(amount=-CUT_EXTRUDE11_DEPTH, mode=Mode.SUBTRACT)

    # Sketch22 → Cut-Extrude12 (cut)
    with BuildSketch(Plane(origin=(0, 106.5, 0), x_dir=(1, 0, 0), z_dir=(0, 1, 0))):
        with Locations(Location((-53.000000000000014, -122.75000000000003, 0), (0, 0, 270))):
            Circle(SKETCH22_R)
        with Locations(Location((53.000000000000014, -121.25000000000003, 0), (0, 0, 270))):
            Circle(SKETCH22_R_2)
        with Locations(Location((53.000000000000014, -124.25000000000003, 0), (0, 0, 270))):
            Circle(SKETCH22_R_2)
        with Locations(Location((48.000000000000014, -122.75000000000003, 0), (0, 0, 270))):
            Circle(SKETCH22_R_3)
    extrude(amount=-CUT_EXTRUDE12_DEPTH, mode=Mode.SUBTRACT)

    # Sketch23 → Cut-Extrude13 (cut)
    with BuildSketch(Plane.XZ.offset(-105)):
        with Locations((5.748765940339929, 69.87855319631414)):
            Rectangle(SKETCH23_W, SKETCH23_H)
    extrude(amount=-CUT_EXTRUDE13_DEPTH, mode=Mode.SUBTRACT)


with BuildPart() as cut_extrude6_piece_2:
    # of the separate pieces the step leaves, piece 2, a body of its own (cut_extrude6_pieces)
    add(part_1.part.solids().sort_by_distance((-78, 2, -32.75))[0])

    # Sketch18 → Cut-Extrude7 (cut)
    with BuildSketch(Plane.XZ.offset(-99.99999999999999)):
        Rectangle(SKETCH18_W, SKETCH18_H)
    extrude(amount=CUT_EXTRUDE7_DEPTH, mode=Mode.SUBTRACT)


with BuildPart() as cut_extrude13_piece_1:
    # of the separate pieces the step leaves, piece 1, a body of its own (cut_extrude13_pieces)
    add(cut_extrude6_piece_1.part.solids().sort_by_distance((-79.25, 105, 59.878553196))[0])

    # Sketch25 → Boss-Extrude8 (add)
    with BuildSketch(Plane.XY.offset(59.87855319631415)):
        with BuildLine():
            Line((79.24999999999999, 105), (79.24999999999997, 105.25))
            ThreePointArc((79.24999999999997, 105.25), (78.88388347648316, 106.13388347648318), (77.99999999999999, 106.5))
            Line((77.99999999999999, 106.5), (-78.00000000000003, 106.5))
            ThreePointArc((-78.00000000000003, 106.5), (-78.8838834764832, 106.13388347648319), (-79.25000000000003, 105.25))
            Line((-79.25000000000003, 105.25), (-79.25000000000003, 105))
            Line((-79.25000000000003, 105), (79.24999999999999, 105))
        make_face()
    extrude(amount=BOSS_EXTRUDE8_DEPTH)

    # Fillet7
    fillet7_edges = [cut_extrude13_piece_1.edges().sort_by_distance(p)[0] for p in [
        (79.24999999999997, 105.125, 138.99855319631416),
        (78.88388347648316, 106.13388347648318, 138.99855319631416),
        (-1.421e-14, 106.5, 138.99855319631416),
        (-78.8838834764832, 106.13388347648319, 138.99855319631416),
        (-79.25000000000003, 105.125, 138.99855319631416),
    ]]
    fillet(fillet7_edges, radius=FILLET7_R)

    # Sketch27 → Cut-Extrude16 (cut)
    with BuildSketch(Plane(origin=(0, 106.5, 0), x_dir=(1, 0, 0), z_dir=(0, 1, 0))):
        with Locations(Location((-53.00000000000005, -102.74855319631415, 0), (0, 0, 270))):
            Circle(SKETCH27_R)
        with Locations(Location((51.437037476114, -102.74855319631415, 0), (0, 0, 270))):
            Circle(SKETCH27_R_2)
        with Locations(Location((56.43703747611401, -101.24855319631415, 0), (0, 0, 270))):
            Circle(SKETCH27_R_3)
        with Locations(Location((56.437037476114, -104.24855319631413, 0), (0, 0, 270))):
            Circle(SKETCH27_R_4)
        with Locations((-49.25000000000004, -102.74855319631416)):
            Rectangle(SKETCH27_W, SKETCH27_H)
    extrude(amount=-CUT_EXTRUDE16_DEPTH, mode=Mode.SUBTRACT)

    # Sketch28 → Cut-Extrude17 (cut)
    with BuildSketch(Plane(origin=(0, 106.5, 0), x_dir=(1, 0, 0), z_dir=(0, 1, 0))):
        with BuildLine():
            ThreePointArc((-72.72500000000001, -133.99855319631416), (-74.25000000000001, -132.47355319631416), (-75.77500000000002, -133.99855319631416))
            Line((-75.77500000000002, -133.99855319631416), (-74.25000000000001, -133.99855319631416))
            Line((-74.25000000000001, -133.99855319631416), (-74.25000000000001, -135.52355319631417))
            ThreePointArc((-74.25, -135.52355319631417), (-73.17166215869052, -135.07689103762365), (-72.72500000000001, -133.99855319631416))
        make_face()
        with BuildLine():
            Line((-74.25000000000001, -133.99855319631416), (-75.77500000000002, -133.99855319631416))
            ThreePointArc((-75.77500000000002, -133.99855319631416), (-75.32833784130949, -135.07689103762365), (-74.25, -135.52355319631417))
            Line((-74.25000000000001, -135.52355319631417), (-74.25000000000001, -133.99855319631416))
        make_face()
        with Locations(Location((74.25000000000001, -133.99855319631462, 0), (0, 0, 270))):
            Circle(SKETCH28_R)
    extrude(amount=-CUT_EXTRUDE17_DEPTH, mode=Mode.SUBTRACT)


with BuildPart() as cut_extrude13_piece_2:
    # of the separate pieces the step leaves, piece 2, a body of its own (cut_extrude13_pieces)
    add(cut_extrude6_piece_1.part.solids().sort_by_distance((-78, 105.25, 159))[0])

    # Sketch24 → Cut-Extrude14 (cut)
    with BuildSketch(Plane(origin=(0, 0, 79.87855319631414), x_dir=(-1, 0, 0), z_dir=(0, 0, -1))):
        with Locations((-6.53504656057757, 105)):
            Rectangle(SKETCH24_W, SKETCH24_H)
    extrude(amount=-CUT_EXTRUDE14_DEPTH, mode=Mode.SUBTRACT)


solid = cut_extrude13_piece_1.part
